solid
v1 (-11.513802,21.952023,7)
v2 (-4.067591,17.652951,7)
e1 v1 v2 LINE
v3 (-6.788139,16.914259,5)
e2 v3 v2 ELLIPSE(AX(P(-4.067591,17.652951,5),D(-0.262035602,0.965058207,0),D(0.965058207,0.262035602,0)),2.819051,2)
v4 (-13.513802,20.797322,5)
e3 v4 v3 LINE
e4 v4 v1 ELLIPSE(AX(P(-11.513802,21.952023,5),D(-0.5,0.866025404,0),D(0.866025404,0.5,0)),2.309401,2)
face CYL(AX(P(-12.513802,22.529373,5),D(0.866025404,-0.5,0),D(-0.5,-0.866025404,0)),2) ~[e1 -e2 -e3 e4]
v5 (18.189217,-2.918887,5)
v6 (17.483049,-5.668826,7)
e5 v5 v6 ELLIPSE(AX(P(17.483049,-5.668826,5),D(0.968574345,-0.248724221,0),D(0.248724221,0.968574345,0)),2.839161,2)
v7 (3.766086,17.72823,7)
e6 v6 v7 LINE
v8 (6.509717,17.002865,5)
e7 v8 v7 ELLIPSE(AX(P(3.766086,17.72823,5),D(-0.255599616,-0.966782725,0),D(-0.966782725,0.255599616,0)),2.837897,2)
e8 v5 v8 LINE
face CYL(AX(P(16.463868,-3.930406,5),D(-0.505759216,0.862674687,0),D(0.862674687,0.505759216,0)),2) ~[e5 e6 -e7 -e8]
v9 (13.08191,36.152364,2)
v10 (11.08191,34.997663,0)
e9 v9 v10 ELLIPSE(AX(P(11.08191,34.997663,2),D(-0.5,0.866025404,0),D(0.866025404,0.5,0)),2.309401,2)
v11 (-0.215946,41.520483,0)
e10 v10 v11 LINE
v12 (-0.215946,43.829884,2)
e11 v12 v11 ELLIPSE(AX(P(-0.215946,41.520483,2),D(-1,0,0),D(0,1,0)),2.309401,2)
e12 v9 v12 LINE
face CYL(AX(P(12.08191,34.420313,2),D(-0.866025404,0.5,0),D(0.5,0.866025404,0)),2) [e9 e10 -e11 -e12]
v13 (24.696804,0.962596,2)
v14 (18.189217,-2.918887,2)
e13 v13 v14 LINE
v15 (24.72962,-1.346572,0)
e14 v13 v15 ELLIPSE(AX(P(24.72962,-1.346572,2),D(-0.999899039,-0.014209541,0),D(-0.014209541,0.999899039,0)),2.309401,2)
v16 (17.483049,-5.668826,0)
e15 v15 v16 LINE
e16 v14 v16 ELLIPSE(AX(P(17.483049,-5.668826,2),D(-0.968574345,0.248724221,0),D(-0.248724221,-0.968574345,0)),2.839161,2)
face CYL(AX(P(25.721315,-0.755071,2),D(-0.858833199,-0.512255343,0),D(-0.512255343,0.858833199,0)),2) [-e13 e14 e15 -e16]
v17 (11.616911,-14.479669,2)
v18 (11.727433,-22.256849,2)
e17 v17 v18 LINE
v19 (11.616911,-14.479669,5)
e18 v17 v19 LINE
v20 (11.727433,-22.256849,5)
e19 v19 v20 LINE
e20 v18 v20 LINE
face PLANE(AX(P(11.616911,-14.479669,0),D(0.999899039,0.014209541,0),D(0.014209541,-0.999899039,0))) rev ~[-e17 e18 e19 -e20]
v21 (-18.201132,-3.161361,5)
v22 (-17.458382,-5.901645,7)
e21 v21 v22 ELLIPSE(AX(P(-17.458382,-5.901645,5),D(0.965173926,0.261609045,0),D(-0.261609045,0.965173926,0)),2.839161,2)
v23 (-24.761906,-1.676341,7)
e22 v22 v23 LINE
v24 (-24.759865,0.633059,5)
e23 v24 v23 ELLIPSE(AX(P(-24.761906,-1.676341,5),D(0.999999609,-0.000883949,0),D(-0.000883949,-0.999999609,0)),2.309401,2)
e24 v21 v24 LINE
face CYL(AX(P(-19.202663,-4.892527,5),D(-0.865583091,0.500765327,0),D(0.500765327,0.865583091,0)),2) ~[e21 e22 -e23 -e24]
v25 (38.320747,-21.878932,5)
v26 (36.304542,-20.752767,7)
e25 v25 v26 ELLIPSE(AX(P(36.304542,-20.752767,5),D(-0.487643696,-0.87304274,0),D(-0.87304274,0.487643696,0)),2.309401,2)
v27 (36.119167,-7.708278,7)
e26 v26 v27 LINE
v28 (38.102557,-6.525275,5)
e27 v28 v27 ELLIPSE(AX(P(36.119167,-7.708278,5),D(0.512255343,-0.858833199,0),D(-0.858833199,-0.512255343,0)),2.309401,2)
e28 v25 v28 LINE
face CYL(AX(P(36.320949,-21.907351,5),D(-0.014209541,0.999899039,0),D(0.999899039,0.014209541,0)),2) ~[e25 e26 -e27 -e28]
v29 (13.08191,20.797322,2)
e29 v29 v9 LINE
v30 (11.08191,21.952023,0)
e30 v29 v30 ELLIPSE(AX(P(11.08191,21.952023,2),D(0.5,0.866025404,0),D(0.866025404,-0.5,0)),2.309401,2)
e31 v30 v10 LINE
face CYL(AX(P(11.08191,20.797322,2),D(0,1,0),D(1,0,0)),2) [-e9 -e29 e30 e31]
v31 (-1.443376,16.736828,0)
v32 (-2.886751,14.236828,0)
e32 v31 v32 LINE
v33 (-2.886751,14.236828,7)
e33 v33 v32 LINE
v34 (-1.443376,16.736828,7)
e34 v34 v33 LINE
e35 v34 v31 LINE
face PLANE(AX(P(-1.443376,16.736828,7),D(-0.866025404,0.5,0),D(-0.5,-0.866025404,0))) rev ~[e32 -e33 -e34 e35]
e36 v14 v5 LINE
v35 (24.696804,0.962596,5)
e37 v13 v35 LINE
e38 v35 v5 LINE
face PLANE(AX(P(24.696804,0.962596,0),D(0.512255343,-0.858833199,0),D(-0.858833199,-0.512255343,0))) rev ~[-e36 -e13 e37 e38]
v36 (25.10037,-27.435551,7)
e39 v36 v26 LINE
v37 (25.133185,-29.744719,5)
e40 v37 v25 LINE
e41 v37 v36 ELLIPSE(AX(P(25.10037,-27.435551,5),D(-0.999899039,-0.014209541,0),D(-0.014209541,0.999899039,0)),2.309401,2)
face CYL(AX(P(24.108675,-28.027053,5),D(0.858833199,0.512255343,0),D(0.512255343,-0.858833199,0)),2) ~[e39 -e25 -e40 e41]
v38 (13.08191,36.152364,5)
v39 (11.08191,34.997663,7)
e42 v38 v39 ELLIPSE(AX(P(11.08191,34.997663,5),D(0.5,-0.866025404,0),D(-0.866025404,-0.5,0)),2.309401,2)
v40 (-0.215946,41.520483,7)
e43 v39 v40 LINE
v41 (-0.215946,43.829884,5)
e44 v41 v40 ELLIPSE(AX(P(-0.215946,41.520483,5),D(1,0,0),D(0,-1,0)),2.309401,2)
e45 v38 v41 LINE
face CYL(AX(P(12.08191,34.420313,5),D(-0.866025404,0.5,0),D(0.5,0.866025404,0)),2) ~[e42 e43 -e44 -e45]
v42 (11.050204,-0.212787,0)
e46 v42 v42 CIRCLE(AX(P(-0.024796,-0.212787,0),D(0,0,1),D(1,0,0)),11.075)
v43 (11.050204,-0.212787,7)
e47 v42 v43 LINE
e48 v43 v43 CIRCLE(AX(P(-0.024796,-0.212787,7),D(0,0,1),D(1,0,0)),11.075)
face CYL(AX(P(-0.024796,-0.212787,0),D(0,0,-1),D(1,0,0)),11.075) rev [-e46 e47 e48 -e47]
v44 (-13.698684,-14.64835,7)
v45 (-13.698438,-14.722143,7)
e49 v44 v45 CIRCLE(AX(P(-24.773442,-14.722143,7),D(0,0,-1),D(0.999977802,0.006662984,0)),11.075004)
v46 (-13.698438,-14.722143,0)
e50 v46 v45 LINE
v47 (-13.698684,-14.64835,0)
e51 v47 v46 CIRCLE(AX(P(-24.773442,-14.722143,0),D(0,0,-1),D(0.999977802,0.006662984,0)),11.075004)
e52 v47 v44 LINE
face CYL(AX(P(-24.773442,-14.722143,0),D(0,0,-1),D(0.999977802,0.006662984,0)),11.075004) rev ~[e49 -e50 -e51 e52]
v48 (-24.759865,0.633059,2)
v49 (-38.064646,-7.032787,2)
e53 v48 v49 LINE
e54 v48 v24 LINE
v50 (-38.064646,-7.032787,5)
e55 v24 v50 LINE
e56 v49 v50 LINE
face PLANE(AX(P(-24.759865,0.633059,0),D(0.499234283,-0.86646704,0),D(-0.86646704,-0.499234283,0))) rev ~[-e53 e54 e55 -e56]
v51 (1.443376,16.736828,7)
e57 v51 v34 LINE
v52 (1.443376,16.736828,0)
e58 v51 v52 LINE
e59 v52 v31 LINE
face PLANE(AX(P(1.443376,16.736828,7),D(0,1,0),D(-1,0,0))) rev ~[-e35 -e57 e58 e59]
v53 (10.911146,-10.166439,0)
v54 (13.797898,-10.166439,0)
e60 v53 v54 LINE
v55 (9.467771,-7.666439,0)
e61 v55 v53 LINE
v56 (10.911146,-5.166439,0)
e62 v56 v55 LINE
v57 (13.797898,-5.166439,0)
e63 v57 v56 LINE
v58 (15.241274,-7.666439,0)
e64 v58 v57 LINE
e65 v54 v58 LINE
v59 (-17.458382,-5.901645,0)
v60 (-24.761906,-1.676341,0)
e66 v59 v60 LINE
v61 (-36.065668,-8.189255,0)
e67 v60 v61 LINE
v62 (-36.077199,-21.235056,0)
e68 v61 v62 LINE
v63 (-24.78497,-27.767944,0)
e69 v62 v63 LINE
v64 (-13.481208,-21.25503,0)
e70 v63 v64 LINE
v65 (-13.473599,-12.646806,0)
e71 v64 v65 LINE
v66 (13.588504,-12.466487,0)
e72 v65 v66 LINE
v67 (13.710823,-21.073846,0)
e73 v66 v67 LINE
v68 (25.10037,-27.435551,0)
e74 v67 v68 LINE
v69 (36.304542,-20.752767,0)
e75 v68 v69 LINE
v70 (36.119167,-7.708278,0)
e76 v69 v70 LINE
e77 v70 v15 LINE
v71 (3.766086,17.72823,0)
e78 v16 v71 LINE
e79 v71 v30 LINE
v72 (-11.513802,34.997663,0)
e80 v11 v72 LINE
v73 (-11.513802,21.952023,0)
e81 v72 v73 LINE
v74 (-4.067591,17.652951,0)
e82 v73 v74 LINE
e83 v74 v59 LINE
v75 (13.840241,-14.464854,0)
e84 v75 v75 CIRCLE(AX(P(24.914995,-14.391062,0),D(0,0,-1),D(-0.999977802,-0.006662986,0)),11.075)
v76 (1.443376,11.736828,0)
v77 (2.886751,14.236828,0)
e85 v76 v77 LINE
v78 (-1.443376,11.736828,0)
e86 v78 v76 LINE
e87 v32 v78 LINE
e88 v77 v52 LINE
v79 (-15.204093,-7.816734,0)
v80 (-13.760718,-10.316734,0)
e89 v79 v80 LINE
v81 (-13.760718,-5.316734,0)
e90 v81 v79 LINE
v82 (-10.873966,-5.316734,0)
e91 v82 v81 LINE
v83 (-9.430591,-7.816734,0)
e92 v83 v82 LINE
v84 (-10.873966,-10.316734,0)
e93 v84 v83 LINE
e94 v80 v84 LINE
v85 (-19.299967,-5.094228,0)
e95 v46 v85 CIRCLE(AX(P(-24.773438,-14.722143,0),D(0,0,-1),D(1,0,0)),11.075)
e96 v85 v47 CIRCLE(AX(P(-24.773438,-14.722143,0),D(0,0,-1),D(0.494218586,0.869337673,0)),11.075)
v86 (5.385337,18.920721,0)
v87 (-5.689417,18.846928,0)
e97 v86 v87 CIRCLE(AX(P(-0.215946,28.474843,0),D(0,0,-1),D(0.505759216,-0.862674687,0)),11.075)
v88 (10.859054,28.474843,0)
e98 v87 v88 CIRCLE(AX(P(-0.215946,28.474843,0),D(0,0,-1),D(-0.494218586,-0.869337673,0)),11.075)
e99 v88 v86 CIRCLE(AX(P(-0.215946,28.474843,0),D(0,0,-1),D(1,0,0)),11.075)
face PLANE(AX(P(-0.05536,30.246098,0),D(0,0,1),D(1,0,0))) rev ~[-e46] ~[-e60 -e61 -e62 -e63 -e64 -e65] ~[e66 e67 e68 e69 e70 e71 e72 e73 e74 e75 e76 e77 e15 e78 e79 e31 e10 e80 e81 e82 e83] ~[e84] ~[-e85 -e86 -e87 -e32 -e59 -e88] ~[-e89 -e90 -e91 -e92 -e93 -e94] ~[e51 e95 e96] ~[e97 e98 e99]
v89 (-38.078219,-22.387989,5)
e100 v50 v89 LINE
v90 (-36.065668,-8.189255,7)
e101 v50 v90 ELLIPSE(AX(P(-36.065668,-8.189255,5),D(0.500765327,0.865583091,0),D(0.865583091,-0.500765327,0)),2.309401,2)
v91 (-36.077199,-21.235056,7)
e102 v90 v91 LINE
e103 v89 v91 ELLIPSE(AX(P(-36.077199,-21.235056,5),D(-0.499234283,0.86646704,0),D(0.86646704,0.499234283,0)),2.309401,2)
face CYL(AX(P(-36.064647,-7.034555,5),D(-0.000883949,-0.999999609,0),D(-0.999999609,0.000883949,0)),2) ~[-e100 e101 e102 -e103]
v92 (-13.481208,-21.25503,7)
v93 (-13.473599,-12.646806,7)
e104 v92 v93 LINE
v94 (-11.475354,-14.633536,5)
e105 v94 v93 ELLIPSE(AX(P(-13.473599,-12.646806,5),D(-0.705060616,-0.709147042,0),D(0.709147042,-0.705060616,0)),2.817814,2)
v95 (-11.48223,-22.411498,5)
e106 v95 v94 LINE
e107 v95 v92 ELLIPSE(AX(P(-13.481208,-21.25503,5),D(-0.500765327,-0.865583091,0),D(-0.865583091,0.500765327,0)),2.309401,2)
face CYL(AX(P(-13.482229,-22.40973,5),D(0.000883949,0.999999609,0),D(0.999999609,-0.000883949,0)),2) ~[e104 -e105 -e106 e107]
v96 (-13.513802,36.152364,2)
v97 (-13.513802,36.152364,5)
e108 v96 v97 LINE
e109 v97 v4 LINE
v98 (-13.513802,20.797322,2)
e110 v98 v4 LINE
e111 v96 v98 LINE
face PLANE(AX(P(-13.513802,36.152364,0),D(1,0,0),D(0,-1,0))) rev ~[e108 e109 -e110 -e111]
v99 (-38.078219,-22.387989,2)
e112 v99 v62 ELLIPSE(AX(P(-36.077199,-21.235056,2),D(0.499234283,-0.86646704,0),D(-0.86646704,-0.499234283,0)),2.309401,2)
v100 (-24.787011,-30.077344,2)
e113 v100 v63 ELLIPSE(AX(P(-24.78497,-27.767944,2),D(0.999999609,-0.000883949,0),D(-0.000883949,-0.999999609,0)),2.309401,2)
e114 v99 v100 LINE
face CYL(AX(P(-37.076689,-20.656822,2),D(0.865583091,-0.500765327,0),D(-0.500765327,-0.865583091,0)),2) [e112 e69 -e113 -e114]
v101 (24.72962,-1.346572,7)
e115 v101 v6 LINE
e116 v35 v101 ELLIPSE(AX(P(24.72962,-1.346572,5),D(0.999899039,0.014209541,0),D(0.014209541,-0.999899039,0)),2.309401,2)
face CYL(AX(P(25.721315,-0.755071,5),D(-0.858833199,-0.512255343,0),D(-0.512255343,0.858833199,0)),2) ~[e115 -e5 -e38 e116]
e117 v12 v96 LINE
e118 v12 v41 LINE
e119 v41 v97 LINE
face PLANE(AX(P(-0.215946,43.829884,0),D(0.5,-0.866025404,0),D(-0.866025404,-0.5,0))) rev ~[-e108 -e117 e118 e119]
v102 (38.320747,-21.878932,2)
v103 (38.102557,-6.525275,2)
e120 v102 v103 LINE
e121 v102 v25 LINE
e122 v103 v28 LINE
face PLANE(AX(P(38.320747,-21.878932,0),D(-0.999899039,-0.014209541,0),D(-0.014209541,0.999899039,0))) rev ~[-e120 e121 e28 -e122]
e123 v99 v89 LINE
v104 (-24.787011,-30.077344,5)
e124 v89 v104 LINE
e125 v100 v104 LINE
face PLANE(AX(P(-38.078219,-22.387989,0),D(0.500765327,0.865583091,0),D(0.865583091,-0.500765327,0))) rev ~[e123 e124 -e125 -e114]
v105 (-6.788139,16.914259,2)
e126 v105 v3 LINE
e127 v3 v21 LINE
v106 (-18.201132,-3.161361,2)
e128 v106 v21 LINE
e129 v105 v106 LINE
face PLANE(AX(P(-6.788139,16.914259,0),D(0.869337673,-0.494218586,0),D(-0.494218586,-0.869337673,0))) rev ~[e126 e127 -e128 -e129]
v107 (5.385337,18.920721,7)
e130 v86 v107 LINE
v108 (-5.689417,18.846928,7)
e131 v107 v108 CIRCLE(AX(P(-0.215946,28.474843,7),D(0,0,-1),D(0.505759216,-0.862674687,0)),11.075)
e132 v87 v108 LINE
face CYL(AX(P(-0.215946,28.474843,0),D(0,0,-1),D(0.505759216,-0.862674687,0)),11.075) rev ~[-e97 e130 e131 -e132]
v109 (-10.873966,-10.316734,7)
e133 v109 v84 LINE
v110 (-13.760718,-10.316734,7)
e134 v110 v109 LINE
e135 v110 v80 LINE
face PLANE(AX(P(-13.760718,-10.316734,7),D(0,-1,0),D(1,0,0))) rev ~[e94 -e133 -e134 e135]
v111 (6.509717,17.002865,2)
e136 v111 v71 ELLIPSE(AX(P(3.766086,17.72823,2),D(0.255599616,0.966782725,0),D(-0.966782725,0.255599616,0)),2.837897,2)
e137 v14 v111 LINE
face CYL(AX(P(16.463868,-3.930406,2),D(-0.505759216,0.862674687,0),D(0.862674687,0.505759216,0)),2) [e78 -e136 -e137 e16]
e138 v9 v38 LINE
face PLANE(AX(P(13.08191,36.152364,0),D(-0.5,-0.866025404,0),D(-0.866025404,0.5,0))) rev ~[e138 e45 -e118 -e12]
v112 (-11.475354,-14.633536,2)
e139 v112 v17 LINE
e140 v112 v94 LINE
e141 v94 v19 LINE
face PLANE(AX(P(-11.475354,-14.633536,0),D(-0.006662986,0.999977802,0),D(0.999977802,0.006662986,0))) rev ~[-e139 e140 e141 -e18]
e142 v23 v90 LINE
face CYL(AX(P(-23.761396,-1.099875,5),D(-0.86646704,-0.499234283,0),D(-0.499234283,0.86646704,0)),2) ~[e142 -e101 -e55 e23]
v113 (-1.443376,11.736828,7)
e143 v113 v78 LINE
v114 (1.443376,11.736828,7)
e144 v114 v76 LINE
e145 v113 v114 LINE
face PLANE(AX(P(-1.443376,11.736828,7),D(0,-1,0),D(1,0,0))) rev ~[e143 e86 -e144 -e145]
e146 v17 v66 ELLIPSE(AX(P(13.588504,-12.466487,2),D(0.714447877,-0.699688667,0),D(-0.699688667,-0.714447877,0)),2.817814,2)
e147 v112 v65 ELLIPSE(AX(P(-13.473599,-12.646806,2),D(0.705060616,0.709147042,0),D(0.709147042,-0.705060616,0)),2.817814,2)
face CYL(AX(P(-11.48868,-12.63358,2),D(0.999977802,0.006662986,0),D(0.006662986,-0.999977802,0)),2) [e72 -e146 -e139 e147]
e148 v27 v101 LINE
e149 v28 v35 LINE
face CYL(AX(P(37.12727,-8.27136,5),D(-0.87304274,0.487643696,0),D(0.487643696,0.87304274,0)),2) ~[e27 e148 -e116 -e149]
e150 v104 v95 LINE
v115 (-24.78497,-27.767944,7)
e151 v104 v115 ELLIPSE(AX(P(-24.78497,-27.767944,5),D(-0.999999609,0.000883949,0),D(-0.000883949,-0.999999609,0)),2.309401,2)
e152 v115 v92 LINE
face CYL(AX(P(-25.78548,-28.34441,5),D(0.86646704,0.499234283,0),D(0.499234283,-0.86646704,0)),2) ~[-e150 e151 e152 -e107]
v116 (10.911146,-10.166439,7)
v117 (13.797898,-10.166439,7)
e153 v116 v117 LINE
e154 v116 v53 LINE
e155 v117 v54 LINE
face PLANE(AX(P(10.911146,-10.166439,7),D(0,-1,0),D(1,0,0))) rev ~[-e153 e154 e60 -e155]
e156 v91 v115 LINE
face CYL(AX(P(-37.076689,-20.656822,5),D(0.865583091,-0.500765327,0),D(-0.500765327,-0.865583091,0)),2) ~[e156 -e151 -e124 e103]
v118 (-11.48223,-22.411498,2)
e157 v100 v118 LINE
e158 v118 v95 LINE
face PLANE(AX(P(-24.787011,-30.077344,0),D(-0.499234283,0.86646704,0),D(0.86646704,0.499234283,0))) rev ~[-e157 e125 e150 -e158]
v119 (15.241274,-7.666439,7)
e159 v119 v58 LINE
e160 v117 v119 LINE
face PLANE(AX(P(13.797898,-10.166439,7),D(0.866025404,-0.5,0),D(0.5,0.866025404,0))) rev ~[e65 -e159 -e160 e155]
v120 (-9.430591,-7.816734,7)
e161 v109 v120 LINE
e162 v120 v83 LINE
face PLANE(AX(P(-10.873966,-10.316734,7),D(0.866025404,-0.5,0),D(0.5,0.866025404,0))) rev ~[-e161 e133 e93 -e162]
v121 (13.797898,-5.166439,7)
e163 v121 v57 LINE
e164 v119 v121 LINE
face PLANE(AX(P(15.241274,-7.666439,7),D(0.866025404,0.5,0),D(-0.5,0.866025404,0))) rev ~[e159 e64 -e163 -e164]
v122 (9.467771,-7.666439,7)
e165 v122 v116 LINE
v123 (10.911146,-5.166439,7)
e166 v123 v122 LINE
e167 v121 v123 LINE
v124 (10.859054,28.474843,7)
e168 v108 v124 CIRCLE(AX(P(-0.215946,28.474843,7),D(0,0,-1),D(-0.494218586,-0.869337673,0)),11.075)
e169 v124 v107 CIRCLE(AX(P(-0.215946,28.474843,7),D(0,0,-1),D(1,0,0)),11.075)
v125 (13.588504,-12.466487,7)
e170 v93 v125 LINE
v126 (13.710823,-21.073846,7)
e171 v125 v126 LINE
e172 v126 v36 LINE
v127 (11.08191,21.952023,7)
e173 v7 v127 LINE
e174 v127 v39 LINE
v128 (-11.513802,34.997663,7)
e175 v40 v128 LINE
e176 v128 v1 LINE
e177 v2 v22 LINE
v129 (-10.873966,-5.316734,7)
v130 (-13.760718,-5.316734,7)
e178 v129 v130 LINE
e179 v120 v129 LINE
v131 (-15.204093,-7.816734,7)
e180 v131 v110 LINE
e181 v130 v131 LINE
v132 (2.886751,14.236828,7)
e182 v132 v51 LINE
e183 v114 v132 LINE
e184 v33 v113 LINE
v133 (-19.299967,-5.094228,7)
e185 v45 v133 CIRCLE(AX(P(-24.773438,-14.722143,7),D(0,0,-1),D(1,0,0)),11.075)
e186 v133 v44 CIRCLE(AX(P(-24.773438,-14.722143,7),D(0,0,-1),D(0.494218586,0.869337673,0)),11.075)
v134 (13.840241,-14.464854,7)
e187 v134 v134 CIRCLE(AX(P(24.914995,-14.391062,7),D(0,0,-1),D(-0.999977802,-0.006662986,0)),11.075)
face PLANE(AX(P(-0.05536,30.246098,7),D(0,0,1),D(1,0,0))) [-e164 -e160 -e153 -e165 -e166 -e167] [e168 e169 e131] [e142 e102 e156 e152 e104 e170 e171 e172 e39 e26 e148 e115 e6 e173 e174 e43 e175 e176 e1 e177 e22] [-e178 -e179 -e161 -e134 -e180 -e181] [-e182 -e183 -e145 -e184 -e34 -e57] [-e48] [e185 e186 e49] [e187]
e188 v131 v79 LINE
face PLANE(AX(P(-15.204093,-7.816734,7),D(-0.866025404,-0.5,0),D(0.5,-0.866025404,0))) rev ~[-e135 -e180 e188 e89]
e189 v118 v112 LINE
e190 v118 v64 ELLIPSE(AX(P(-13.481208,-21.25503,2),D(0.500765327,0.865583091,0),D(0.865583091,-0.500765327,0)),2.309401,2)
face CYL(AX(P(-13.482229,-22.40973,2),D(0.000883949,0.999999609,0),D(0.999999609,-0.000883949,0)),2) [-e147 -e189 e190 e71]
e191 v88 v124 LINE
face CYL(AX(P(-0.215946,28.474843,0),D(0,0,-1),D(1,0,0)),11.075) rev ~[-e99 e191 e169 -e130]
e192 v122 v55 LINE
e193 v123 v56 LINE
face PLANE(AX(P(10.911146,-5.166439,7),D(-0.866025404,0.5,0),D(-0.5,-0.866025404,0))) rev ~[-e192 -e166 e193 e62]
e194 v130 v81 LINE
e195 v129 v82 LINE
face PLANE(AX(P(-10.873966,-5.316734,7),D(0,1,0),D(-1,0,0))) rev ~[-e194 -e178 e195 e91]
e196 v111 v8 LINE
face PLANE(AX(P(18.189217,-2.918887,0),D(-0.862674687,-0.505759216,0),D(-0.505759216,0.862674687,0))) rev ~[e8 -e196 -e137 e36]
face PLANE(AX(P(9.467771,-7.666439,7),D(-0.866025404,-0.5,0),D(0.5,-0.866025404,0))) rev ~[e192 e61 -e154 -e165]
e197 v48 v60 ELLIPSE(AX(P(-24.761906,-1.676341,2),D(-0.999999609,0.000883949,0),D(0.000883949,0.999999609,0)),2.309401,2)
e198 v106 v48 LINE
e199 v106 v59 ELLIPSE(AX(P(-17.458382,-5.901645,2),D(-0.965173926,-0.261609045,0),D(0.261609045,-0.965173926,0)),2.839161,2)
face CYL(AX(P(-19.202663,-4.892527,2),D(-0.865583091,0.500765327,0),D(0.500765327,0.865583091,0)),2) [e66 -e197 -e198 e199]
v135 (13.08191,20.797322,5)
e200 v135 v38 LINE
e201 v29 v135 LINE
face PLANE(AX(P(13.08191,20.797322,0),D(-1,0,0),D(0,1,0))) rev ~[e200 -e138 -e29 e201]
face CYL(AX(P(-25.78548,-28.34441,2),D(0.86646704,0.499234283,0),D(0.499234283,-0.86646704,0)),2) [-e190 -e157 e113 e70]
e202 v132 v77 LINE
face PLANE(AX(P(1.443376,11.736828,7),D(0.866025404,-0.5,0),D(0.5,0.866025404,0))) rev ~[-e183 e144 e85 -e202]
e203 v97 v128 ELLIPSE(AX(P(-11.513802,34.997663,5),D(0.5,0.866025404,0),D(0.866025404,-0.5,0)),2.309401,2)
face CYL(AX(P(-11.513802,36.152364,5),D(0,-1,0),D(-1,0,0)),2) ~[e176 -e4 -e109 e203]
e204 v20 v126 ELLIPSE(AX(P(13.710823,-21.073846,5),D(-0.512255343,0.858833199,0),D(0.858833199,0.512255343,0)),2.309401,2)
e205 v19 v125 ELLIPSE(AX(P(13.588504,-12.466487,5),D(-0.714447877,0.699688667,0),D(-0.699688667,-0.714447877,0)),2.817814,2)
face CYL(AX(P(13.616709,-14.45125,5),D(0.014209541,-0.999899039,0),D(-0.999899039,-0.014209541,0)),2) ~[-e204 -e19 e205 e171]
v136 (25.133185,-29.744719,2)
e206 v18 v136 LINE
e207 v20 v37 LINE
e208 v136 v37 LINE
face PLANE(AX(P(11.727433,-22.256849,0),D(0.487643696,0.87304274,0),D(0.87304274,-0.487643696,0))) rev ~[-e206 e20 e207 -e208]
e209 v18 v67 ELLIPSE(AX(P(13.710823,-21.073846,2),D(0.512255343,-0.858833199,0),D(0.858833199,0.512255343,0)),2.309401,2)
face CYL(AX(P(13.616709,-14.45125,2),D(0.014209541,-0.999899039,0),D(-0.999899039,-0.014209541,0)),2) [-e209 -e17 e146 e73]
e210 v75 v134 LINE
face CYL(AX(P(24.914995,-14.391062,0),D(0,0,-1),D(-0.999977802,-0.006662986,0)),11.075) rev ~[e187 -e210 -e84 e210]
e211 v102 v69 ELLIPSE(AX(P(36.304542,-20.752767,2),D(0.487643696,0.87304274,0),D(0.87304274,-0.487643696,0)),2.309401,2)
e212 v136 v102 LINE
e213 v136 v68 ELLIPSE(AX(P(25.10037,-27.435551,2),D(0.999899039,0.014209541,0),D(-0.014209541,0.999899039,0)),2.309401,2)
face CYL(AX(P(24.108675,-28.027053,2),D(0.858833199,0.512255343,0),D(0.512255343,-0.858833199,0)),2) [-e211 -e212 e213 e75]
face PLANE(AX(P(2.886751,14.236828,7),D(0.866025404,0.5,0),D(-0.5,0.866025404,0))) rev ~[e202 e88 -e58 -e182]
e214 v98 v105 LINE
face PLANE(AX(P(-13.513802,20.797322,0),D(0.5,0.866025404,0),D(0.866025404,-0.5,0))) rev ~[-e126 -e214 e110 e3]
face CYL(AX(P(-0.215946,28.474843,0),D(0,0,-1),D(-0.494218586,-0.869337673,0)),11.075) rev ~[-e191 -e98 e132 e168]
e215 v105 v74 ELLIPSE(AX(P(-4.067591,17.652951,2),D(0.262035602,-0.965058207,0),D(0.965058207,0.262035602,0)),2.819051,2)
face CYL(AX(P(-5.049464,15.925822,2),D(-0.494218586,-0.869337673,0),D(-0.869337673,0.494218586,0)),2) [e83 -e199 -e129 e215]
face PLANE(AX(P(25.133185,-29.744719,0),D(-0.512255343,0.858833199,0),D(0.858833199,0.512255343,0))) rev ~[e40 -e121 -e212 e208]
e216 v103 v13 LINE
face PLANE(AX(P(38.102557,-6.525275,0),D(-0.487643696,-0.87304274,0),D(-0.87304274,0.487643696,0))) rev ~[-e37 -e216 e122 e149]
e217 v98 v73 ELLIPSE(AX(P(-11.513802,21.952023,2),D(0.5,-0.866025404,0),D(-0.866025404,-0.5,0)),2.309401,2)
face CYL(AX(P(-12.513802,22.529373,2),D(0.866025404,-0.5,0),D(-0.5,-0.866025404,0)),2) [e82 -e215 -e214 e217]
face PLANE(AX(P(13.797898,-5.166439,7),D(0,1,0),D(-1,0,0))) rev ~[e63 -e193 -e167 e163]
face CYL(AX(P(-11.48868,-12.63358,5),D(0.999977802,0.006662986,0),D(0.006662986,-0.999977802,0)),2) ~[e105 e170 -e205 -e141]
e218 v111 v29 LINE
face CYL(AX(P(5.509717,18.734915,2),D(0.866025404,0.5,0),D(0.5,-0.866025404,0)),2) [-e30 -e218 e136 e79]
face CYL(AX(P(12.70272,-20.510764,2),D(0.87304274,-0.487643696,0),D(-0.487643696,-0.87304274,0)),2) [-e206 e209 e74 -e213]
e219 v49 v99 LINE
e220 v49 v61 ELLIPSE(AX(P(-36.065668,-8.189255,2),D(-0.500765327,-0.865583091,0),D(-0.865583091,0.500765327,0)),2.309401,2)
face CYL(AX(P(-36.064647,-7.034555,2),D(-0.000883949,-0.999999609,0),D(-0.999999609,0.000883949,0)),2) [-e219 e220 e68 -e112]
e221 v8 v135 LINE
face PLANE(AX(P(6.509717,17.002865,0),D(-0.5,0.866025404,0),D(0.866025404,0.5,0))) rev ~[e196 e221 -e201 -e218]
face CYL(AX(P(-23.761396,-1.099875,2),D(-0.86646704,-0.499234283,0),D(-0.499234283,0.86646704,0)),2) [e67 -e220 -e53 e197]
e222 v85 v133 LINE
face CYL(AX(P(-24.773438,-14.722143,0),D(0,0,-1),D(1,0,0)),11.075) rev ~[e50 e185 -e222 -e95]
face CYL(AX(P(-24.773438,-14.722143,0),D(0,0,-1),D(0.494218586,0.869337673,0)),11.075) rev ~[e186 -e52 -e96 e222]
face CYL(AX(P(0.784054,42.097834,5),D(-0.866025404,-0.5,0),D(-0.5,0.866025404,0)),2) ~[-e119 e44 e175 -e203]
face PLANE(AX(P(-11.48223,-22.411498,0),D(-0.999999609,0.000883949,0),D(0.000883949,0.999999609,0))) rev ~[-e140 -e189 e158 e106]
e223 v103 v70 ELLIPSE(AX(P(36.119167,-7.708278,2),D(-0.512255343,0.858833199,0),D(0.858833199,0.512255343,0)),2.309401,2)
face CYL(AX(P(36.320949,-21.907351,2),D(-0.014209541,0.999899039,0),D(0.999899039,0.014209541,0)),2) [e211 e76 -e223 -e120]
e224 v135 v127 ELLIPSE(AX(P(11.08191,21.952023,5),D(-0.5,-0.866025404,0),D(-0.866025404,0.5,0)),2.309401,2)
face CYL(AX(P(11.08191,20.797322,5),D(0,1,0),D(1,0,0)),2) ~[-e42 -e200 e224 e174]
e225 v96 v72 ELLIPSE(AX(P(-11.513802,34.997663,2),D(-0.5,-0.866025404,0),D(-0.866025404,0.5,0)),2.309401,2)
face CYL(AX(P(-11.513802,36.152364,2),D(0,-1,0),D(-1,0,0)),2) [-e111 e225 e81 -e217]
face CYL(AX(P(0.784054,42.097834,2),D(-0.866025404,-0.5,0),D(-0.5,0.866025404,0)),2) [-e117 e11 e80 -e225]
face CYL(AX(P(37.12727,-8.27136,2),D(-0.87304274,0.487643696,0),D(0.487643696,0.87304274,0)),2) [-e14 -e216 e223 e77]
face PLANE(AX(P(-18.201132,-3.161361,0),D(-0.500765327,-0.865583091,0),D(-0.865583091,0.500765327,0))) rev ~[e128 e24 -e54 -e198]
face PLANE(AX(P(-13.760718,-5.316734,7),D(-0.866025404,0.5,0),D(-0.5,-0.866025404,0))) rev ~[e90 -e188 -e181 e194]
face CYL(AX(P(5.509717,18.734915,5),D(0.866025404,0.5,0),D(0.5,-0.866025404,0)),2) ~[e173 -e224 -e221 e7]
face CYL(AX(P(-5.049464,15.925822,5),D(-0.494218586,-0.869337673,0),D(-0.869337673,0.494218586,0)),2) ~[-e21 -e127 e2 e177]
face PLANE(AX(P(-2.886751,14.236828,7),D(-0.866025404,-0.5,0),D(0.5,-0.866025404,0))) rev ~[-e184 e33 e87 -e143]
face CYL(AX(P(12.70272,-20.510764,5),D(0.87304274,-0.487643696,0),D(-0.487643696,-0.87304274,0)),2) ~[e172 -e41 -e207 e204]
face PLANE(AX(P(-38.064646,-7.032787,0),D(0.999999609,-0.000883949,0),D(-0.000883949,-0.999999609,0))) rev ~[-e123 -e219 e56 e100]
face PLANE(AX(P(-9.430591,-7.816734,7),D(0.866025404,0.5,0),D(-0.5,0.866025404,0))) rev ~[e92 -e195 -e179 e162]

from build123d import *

# Parameters (mm, degrees)
F0_R     = 11.075
F1_DEPTH = 7
F2_R     = 2
F4_DEPTH = 25


# Not quite as in the source:
# - a feature names something its author has since deleted; it is built from what else it names


with BuildPart() as f1:
    # F0 (on Top) → F1 (new body)
    with BuildSketch(Plane.XY):
        with BuildLine():
            ThreePointArc((10.8590541373, 28.4748429105), (9.3936805028, 22.9693269387), (5.3853374572, 18.9207207546))
            Line((5.3853374572, 18.9207207546), (6.5097166395, 17.0028645343))
            Line((6.5097166395, 17.0028645343), (13.0819100939, 20.7973221943))
            Line((13.0819100939, 20.7973221943), (13.0819100939, 36.1523636266))
            Line((13.0819100939, 36.1523636266), (-0.2159458627, 43.8298843428))
            Line((-0.2159458627, 43.8298843428), (-13.5138018192, 36.1523636266))
            Line((-13.5138018192, 36.1523636266), (-13.5138018192, 20.7973221943))
            Line((-13.5138018192, 20.7973221943), (-6.7881393171, 16.9142591382))
            Line((-6.7881393171, 16.9142591382), (-5.6894167006, 18.8469281837))
            ThreePointArc((-5.6894167006, 18.8469281837), (-5.7853684301, 38.0475727858), (10.8590541373, 28.4748429105))
        make_face()
        with BuildLine():
            Line((6.5097166395, 17.0028645343), (5.3853374572, 18.9207207546))
            ThreePointArc((5.3853374572, 18.9207207546), (-0.1421532918, 17.4000887526), (-5.6894167006, 18.8469281837))
            Line((-5.6894167006, 18.8469281837), (-6.7881393171, 16.9142591382))
            Line((-6.7881393171, 16.9142591382), (-0.2159458627, 13.1198014782))
            Line((-0.2159458627, 13.1198014782), (6.5097166395, 17.0028645343))
        make_face()
        Polygon((18.1892172392, -2.9188871567), (6.5097166395, 17.0028645343), (-0.2159458627, 13.1198014782), (-6.7881393171, 16.9142591382), (-18.2011320695, -3.1613609301), (-11.4686565798, -7.0562964045), (-11.4753544728, -14.6335356233), (11.6169113166, -14.4796687622), (11.5092421808, -6.9031915863), align=None)
        with Locations((-0.0247963396, -0.2127871583)):
            Circle(F0_R, mode=Mode.SUBTRACT)
        with BuildLine():
            Line((19.313711516, -4.836939694), (18.1892172392, -2.9188871567))
            Line((18.1892172392, -2.9188871567), (11.5092421808, -6.9031915863))
            Line((11.5092421808, -6.9031915863), (11.6169113166, -14.4796687622))
            Line((11.6169113166, -14.4796687622), (13.840240678, -14.4648544208))
            ThreePointArc((13.840240678, -14.4648544208), (15.2870801091, -8.917591012), (19.313711516, -4.836939694))
        make_face()
        with BuildLine():
            Line((-11.4686565798, -7.0562964045), (-18.2011320695, -3.1613609301))
            Line((-18.2011320695, -3.1613609301), (-19.2999671542, -5.0942278088))
            ThreePointArc((-19.2999671542, -5.0942278088), (-15.2193158362, -9.1208592157), (-13.6986838342, -14.6483499647))
            Line((-13.6986838342, -14.6483499647), (-11.4753544728, -14.6335356233))
            Line((-11.4753544728, -14.6335356233), (-11.4686565798, -7.0562964045))
        make_face()
        with BuildLine():
            Line((-19.2999671542, -5.0942278088), (-18.2011320695, -3.1613609301))
            Line((-18.2011320695, -3.1613609301), (-24.759864777, 0.6330592247))
            Line((-24.759864777, 0.6330592247), (-38.0646461892, -7.0327869064))
            Line((-38.0646461892, -7.0327869064), (-38.0782194043, -22.3879886667))
            Line((-38.0782194043, -22.3879886667), (-24.7870112072, -30.077344296))
            Line((-24.7870112072, -30.077344296), (-11.4822297949, -22.4114981649))
            Line((-11.4822297949, -22.4114981649), (-11.4753544728, -14.6335356233))
            Line((-11.4753544728, -14.6335356233), (-13.6986838342, -14.6483499647))
            ThreePointArc((-13.6986838342, -14.6483499647), (-13.6984994528, -14.6852460454), (-13.6984379921, -14.7221425356))
            ThreePointArc((-13.6984379921, -14.7221425356), (-34.3461678674, -20.2915651031), (-19.2999671542, -5.0942278088))
        make_face()
        with BuildLine():
            Line((24.6968043769, 0.9625956381), (18.1892172392, -2.9188871567))
            Line((18.1892172392, -2.9188871567), (19.313711516, -4.836939694))
            ThreePointArc((19.313711516, -4.836939694), (30.4205108077, -4.7814354844), (35.9899948359, -14.3910618499))
            ThreePointArc((35.9899948359, -14.3910618499), (24.9518913261, -25.4660003892), (13.840240678, -14.4648544208))
            Line((13.840240678, -14.4648544208), (11.6169113166, -14.4796687622))
            Line((11.6169113166, -14.4796687622), (11.7274326398, -22.2568490742))
            Line((11.7274326398, -22.2568490742), (25.1331852948, -29.7447193378))
            Line((25.1331852948, -29.7447193378), (38.3207474909, -21.8789321135))
            Line((38.3207474909, -21.8789321135), (38.1025570319, -6.5252746256))
            Line((38.1025570319, -6.5252746256), (24.6968043769, 0.9625956381))
        make_face()
    extrude(amount=F1_DEPTH)

    # F2
    f2_edges = [f1.edges().sort_by_distance(p)[0] for p in [
        (-10.150971, 18.855791, 7),
        (-13.513802, 28.474843, 7),
        (-6.864874, 39.991124, 7),
        (6.432982, 39.991124, 7),
        (13.08191, 28.474843, 7),
        (12.349467, 7.041989, 7),
        (9.795813, 18.900093, 7),
        (21.443011, -0.978146, 7),
        (31.399681, -2.781339, 7),
        (38.211652, -14.202103, 7),
        (31.726966, -25.811826, 7),
        (18.430309, -26.000784, 7),
        (11.672172, -18.368259, 7),
        (0.070778, -14.556602, 7),
        (-11.478792, -18.522517, 7),
        (-31.432615, -26.232666, 7),
        (-18.134621, -26.244421, 7),
        (-38.071433, -14.710388, 7),
        (-31.412255, -3.199864, 7),
        (-21.480498, -1.264151, 7),
        (-12.494636, 6.876449, 7),
        (31.726966, -25.811826, 0),
        (38.211652, -14.202103, 0),
        (31.399681, -2.781339, 0),
        (21.443011, -0.978146, 0),
        (18.430309, -26.000784, 0),
        (11.672172, -18.368259, 0),
        (12.349467, 7.041989, 0),
        (0.070778, -14.556602, 0),
        (9.795813, 18.900093, 0),
        (13.08191, 28.474843, 0),
        (6.432982, 39.991124, 0),
        (-6.864874, 39.991124, 0),
        (-13.513802, 28.474843, 0),
        (-10.150971, 18.855791, 0),
        (-12.494636, 6.876449, 0),
        (-21.480498, -1.264151, 0),
        (-31.412255, -3.199864, 0),
        (-38.071433, -14.710388, 0),
        (-31.432615, -26.232666, 0),
        (-18.134621, -26.244421, 0),
        (-11.478792, -18.522517, 0),
    ]]
    fillet(f2_edges, radius=F2_R)

    # F3 (on face) → F4 (cut)
    with BuildSketch(Plane.XY.offset(7)):
        Polygon((1.443375673, 16.7368283158), (-1.443375673, 16.7368283158), (-2.8867513459, 14.2368283158), (-1.443375673, 11.7368283158), (1.443375673, 11.7368283158), (2.8867513459, 14.2368283158), align=None)
        Polygon((-10.8739663642, -5.3167335935), (-13.7607177101, -5.3167335935), (-15.2040933831, -7.8167335935), (-13.7607177101, -10.3167335935), (-10.8739663642, -10.3167335935), (-9.4305906912, -7.8167335935), align=None)
        Polygon((13.7978978307, -5.1664386955), (10.9111464847, -5.1664386955), (9.4677708117, -7.6664386955), (10.9111464847, -10.1664386955), (13.7978978307, -10.1664386955), (15.2412735036, -7.6664386955), align=None)
    extrude(amount=-F4_DEPTH, mode=Mode.SUBTRACT)


solid = f1.part
